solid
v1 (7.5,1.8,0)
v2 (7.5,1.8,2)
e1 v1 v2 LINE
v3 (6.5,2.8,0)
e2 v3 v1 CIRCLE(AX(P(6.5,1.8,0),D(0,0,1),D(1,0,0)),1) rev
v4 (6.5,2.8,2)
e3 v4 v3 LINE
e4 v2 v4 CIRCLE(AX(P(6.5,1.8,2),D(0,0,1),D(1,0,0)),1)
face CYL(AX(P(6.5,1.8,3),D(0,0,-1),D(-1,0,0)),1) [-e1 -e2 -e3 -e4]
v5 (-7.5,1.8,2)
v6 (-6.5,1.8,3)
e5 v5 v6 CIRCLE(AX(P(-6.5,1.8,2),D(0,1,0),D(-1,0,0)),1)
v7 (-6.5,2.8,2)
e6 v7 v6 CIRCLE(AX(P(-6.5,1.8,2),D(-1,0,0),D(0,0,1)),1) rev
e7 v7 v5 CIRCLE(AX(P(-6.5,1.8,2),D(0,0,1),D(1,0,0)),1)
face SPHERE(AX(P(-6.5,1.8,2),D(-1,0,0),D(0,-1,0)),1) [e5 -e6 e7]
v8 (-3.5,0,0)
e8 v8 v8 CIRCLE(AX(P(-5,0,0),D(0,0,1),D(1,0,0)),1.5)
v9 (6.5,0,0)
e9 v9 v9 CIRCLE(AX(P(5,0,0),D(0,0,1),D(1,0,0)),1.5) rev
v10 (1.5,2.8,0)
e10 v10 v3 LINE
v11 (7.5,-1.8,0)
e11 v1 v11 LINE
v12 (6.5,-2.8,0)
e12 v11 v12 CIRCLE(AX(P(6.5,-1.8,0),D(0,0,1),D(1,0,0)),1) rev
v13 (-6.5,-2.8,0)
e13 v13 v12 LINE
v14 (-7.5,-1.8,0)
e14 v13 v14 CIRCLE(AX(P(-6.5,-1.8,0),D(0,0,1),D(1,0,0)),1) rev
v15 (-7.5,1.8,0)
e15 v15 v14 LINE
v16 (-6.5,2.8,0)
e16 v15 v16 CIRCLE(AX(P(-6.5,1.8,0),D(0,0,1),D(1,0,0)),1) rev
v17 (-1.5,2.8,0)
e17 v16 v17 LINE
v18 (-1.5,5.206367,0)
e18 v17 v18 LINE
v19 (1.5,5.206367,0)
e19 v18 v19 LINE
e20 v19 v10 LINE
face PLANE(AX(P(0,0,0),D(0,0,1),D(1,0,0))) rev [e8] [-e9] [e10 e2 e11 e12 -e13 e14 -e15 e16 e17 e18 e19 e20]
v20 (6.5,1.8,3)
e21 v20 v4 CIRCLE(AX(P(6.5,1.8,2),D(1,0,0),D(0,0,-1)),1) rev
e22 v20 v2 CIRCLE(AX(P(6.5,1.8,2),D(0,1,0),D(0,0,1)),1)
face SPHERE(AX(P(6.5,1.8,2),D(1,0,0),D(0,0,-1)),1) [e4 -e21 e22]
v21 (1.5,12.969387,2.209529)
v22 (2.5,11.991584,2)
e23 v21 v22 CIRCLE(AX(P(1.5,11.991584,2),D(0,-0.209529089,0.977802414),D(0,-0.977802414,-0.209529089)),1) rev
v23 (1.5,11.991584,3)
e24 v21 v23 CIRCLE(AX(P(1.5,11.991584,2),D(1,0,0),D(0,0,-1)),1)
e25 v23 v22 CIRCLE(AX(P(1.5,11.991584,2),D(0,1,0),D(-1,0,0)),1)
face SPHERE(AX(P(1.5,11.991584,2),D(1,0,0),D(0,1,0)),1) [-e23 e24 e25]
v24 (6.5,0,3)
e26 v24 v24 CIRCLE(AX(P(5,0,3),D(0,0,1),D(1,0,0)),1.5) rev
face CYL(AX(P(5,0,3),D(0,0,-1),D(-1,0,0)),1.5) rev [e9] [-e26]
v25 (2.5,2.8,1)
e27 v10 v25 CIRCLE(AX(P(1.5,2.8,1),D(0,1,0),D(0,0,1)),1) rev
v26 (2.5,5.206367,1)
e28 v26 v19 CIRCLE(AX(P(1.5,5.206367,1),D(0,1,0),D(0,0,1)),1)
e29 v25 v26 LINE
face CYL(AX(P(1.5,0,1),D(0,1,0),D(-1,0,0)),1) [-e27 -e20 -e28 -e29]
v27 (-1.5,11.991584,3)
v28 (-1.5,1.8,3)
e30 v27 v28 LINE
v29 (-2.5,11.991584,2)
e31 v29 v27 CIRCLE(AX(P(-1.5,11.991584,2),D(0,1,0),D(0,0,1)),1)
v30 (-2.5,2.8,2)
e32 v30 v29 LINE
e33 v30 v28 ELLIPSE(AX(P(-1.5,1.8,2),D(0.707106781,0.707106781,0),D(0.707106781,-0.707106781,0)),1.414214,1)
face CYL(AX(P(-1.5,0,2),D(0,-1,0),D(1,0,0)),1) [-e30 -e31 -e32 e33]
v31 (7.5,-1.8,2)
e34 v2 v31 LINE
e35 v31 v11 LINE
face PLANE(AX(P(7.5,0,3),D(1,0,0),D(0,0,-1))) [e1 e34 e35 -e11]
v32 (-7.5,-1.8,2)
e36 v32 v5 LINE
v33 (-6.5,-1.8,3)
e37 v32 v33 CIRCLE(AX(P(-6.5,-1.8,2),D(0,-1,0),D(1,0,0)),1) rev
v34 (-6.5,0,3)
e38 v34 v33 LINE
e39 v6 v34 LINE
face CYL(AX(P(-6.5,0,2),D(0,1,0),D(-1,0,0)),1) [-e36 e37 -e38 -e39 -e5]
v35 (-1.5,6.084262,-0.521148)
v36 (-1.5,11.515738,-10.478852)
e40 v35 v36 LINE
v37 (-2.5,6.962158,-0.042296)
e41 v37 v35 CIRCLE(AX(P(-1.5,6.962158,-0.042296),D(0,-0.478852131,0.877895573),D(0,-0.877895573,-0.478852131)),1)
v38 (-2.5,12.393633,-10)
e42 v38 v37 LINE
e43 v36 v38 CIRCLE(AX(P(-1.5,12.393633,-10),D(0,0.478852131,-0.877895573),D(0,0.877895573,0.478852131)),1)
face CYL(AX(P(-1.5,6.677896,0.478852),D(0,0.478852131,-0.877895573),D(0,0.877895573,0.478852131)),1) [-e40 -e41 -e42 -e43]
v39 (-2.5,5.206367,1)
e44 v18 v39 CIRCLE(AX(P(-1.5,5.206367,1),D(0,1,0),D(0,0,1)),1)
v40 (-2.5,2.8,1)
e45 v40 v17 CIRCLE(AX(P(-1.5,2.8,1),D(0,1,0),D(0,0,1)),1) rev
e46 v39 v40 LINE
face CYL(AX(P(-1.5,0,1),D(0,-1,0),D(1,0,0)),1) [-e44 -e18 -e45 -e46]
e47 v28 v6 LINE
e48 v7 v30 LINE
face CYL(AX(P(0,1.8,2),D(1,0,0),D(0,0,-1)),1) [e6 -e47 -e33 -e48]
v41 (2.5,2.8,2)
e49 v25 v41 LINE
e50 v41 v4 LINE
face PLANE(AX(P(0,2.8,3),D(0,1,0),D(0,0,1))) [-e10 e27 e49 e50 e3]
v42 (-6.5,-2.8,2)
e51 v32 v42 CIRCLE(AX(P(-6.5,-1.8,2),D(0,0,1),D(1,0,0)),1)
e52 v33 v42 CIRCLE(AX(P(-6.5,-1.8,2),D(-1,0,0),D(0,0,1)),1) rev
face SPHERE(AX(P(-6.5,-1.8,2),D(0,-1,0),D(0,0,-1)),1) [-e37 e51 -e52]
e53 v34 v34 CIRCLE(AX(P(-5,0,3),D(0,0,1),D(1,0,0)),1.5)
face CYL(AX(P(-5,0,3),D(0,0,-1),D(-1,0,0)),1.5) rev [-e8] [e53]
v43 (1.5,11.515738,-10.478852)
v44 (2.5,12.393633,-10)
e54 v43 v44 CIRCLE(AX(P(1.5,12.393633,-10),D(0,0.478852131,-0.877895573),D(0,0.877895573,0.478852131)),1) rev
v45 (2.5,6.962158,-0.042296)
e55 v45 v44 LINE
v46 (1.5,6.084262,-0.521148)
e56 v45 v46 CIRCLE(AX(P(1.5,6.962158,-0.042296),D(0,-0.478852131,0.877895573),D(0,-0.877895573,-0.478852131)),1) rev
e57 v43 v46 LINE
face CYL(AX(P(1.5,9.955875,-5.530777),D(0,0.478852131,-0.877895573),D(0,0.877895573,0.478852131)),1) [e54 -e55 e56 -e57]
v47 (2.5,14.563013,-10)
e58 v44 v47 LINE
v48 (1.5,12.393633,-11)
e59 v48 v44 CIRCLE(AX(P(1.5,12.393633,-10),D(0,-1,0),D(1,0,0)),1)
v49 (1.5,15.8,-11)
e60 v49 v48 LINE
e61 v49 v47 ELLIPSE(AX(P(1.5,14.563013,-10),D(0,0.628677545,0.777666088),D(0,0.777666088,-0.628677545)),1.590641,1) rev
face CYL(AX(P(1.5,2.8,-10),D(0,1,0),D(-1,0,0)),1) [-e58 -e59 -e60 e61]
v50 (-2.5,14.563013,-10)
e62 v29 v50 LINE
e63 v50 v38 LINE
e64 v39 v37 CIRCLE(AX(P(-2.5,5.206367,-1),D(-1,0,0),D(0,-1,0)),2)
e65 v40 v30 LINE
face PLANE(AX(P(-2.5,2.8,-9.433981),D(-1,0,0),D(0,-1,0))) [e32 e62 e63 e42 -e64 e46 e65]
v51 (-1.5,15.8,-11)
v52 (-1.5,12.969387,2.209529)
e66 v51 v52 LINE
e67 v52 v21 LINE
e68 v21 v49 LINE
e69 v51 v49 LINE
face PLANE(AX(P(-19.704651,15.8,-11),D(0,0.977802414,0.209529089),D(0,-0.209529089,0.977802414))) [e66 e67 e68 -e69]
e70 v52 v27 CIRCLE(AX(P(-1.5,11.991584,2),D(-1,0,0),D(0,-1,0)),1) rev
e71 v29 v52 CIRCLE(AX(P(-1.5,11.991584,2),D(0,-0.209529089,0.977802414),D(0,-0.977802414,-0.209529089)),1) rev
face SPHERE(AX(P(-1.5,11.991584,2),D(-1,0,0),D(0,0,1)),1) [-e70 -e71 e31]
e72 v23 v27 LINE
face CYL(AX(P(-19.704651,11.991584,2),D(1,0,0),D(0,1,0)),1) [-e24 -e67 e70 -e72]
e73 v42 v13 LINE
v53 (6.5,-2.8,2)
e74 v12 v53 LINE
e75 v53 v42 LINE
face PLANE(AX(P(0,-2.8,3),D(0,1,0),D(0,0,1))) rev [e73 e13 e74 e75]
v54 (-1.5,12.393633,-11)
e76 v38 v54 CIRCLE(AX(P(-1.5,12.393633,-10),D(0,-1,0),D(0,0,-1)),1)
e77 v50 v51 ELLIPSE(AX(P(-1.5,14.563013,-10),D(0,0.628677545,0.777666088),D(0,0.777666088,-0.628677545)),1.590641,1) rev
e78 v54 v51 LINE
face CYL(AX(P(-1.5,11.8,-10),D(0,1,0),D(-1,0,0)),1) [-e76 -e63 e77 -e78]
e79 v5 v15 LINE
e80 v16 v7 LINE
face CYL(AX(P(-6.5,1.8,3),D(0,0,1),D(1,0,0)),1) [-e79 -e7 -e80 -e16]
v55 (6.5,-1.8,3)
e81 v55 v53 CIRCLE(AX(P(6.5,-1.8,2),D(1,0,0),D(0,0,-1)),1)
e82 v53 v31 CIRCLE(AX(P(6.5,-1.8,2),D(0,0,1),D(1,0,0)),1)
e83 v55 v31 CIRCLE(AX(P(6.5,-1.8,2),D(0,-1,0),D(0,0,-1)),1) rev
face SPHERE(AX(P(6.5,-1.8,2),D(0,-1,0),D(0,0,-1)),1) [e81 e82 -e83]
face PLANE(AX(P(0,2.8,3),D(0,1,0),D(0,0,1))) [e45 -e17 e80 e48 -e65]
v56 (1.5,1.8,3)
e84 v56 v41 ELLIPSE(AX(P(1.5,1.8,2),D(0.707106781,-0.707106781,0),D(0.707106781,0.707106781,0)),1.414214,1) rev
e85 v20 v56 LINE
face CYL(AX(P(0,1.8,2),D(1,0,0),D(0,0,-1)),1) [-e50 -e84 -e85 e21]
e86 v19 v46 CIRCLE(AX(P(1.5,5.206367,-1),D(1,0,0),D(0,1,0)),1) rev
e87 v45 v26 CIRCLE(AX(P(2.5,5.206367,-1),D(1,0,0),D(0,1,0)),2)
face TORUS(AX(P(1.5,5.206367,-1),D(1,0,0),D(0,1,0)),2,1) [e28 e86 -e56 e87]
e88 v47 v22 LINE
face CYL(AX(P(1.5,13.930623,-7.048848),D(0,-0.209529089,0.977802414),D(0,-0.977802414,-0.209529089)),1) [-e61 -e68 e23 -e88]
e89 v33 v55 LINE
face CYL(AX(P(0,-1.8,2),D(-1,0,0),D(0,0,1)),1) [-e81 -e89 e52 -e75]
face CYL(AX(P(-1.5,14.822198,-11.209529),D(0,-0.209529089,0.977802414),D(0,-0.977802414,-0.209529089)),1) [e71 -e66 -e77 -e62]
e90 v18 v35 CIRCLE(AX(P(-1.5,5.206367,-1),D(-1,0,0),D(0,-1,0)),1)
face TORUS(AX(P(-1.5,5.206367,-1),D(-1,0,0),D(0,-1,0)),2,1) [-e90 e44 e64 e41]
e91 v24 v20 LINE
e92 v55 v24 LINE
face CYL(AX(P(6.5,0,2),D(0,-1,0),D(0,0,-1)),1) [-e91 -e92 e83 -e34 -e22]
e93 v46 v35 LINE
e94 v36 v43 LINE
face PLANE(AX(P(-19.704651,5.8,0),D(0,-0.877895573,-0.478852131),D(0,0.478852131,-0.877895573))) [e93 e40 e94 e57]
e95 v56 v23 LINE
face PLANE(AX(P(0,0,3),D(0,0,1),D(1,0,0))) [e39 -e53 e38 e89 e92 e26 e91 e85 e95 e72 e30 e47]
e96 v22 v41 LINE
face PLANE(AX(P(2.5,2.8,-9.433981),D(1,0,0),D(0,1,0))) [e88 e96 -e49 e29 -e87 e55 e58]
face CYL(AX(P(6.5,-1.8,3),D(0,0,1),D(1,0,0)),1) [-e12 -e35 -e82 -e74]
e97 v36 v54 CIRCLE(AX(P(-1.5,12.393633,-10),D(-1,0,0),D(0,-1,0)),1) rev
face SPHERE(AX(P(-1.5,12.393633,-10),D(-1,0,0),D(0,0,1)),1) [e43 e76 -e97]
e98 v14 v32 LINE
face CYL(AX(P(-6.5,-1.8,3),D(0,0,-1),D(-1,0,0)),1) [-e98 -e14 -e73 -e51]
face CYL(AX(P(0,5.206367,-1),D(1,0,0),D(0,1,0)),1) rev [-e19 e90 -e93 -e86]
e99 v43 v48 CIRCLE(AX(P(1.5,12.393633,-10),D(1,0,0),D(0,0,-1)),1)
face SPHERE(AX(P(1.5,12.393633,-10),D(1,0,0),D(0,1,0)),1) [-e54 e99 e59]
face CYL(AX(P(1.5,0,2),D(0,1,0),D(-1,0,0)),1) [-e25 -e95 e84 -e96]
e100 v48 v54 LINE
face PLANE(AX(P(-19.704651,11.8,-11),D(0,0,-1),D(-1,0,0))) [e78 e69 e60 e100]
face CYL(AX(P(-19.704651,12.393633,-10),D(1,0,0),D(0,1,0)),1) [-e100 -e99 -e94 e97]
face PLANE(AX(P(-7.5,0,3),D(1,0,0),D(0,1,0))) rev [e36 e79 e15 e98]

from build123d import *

# Parameters (mm, degrees)
SKETCH2_W           = 5
SKETCH2_H           = 5.6
SKETCH2_R           = 1.5
BOSS_EXTRUDE1_DEPTH = 3
SKETCH5_W           = 5
SKETCH5_H           = 8
BOSS_EXTRUDE4_DEPTH = 3
BOSS_EXTRUDE5_DEPTH = 5
FILLET3_R           = 1


with BuildPart() as part:
    # Sketch2 → Boss-Extrude1 (new body)
    # profile 1 of 3: a face of its own
    with BuildSketch(Plane.XY):
        with Locations((-5, 0)):
            Rectangle(SKETCH2_W, SKETCH2_H)
        with Locations((-5, 0)):
            Circle(SKETCH2_R, mode=Mode.SUBTRACT)
    # profile 2 of 3: a face of its own
    with BuildSketch(Plane.XY):
        Rectangle(SKETCH2_W, SKETCH2_H)
    # profile 3 of 3: a face of its own
    with BuildSketch(Plane.XY):
        with Locations((5, 0)):
            Rectangle(SKETCH2_W, SKETCH2_H)
        with Locations((5, 0)):
            Circle(SKETCH2_R, mode=Mode.SUBTRACT)
    extrude(amount=BOSS_EXTRUDE1_DEPTH)

    # Sketch5 → Boss-Extrude4 (add)
    with BuildSketch(Plane.XY.offset(3)):
        with Locations((0, 6.8)):
            Rectangle(SKETCH5_W, SKETCH5_H)
    extrude(amount=-BOSS_EXTRUDE4_DEPTH)

    # Sketch6 → Boss-Extrude5 (add)
    with BuildSketch(Plane(origin=(2.5, 0, 0), x_dir=(0, 0, -1), z_dir=(1, 0, 0))):
        Polygon((0, 5.8), (11, 11.8), (11, 15.8), (-3, 12.8), (-3, 10.8), (0, 10.8), align=None)
    extrude(amount=-BOSS_EXTRUDE5_DEPTH)

    # Fillet3
    fillet3_edges = [part.edges().sort_by_distance(p)[0] for p in [
        (0, -2.8, 3),
        (-7.5, -2.8, 1.5),
        (-7.5, 2.8, 1.5),
        (7.5, 2.8, 1.5),
        (7.5, -2.8, 1.5),
        (7.5, 0, 3),
        (-5, 2.8, 3),
        (5, 2.8, 3),
        (-2.5, 7.8, 3),
        (2.5, 7.8, 3),
        (-2.5, 4.3, 0),
        (-7.5, 0, 3),
        (2.5, 4.3, 0),
        (2.5, 8.8, -5.5),
        (2.5, 13.8, -11),
        (2.5, 14.3, -4),
        (-2.5, 8.8, -5.5),
        (0, 11.8, -11),
        (-2.5, 13.8, -11),
        (-2.5, 14.3, -4),
        (0, 12.8, 3),
        (0, 5.8, 0),
    ]]
    fillet(fillet3_edges, radius=FILLET3_R - 0.0001)  # a hair under: the kernel refuses the full size


solid = part.part
